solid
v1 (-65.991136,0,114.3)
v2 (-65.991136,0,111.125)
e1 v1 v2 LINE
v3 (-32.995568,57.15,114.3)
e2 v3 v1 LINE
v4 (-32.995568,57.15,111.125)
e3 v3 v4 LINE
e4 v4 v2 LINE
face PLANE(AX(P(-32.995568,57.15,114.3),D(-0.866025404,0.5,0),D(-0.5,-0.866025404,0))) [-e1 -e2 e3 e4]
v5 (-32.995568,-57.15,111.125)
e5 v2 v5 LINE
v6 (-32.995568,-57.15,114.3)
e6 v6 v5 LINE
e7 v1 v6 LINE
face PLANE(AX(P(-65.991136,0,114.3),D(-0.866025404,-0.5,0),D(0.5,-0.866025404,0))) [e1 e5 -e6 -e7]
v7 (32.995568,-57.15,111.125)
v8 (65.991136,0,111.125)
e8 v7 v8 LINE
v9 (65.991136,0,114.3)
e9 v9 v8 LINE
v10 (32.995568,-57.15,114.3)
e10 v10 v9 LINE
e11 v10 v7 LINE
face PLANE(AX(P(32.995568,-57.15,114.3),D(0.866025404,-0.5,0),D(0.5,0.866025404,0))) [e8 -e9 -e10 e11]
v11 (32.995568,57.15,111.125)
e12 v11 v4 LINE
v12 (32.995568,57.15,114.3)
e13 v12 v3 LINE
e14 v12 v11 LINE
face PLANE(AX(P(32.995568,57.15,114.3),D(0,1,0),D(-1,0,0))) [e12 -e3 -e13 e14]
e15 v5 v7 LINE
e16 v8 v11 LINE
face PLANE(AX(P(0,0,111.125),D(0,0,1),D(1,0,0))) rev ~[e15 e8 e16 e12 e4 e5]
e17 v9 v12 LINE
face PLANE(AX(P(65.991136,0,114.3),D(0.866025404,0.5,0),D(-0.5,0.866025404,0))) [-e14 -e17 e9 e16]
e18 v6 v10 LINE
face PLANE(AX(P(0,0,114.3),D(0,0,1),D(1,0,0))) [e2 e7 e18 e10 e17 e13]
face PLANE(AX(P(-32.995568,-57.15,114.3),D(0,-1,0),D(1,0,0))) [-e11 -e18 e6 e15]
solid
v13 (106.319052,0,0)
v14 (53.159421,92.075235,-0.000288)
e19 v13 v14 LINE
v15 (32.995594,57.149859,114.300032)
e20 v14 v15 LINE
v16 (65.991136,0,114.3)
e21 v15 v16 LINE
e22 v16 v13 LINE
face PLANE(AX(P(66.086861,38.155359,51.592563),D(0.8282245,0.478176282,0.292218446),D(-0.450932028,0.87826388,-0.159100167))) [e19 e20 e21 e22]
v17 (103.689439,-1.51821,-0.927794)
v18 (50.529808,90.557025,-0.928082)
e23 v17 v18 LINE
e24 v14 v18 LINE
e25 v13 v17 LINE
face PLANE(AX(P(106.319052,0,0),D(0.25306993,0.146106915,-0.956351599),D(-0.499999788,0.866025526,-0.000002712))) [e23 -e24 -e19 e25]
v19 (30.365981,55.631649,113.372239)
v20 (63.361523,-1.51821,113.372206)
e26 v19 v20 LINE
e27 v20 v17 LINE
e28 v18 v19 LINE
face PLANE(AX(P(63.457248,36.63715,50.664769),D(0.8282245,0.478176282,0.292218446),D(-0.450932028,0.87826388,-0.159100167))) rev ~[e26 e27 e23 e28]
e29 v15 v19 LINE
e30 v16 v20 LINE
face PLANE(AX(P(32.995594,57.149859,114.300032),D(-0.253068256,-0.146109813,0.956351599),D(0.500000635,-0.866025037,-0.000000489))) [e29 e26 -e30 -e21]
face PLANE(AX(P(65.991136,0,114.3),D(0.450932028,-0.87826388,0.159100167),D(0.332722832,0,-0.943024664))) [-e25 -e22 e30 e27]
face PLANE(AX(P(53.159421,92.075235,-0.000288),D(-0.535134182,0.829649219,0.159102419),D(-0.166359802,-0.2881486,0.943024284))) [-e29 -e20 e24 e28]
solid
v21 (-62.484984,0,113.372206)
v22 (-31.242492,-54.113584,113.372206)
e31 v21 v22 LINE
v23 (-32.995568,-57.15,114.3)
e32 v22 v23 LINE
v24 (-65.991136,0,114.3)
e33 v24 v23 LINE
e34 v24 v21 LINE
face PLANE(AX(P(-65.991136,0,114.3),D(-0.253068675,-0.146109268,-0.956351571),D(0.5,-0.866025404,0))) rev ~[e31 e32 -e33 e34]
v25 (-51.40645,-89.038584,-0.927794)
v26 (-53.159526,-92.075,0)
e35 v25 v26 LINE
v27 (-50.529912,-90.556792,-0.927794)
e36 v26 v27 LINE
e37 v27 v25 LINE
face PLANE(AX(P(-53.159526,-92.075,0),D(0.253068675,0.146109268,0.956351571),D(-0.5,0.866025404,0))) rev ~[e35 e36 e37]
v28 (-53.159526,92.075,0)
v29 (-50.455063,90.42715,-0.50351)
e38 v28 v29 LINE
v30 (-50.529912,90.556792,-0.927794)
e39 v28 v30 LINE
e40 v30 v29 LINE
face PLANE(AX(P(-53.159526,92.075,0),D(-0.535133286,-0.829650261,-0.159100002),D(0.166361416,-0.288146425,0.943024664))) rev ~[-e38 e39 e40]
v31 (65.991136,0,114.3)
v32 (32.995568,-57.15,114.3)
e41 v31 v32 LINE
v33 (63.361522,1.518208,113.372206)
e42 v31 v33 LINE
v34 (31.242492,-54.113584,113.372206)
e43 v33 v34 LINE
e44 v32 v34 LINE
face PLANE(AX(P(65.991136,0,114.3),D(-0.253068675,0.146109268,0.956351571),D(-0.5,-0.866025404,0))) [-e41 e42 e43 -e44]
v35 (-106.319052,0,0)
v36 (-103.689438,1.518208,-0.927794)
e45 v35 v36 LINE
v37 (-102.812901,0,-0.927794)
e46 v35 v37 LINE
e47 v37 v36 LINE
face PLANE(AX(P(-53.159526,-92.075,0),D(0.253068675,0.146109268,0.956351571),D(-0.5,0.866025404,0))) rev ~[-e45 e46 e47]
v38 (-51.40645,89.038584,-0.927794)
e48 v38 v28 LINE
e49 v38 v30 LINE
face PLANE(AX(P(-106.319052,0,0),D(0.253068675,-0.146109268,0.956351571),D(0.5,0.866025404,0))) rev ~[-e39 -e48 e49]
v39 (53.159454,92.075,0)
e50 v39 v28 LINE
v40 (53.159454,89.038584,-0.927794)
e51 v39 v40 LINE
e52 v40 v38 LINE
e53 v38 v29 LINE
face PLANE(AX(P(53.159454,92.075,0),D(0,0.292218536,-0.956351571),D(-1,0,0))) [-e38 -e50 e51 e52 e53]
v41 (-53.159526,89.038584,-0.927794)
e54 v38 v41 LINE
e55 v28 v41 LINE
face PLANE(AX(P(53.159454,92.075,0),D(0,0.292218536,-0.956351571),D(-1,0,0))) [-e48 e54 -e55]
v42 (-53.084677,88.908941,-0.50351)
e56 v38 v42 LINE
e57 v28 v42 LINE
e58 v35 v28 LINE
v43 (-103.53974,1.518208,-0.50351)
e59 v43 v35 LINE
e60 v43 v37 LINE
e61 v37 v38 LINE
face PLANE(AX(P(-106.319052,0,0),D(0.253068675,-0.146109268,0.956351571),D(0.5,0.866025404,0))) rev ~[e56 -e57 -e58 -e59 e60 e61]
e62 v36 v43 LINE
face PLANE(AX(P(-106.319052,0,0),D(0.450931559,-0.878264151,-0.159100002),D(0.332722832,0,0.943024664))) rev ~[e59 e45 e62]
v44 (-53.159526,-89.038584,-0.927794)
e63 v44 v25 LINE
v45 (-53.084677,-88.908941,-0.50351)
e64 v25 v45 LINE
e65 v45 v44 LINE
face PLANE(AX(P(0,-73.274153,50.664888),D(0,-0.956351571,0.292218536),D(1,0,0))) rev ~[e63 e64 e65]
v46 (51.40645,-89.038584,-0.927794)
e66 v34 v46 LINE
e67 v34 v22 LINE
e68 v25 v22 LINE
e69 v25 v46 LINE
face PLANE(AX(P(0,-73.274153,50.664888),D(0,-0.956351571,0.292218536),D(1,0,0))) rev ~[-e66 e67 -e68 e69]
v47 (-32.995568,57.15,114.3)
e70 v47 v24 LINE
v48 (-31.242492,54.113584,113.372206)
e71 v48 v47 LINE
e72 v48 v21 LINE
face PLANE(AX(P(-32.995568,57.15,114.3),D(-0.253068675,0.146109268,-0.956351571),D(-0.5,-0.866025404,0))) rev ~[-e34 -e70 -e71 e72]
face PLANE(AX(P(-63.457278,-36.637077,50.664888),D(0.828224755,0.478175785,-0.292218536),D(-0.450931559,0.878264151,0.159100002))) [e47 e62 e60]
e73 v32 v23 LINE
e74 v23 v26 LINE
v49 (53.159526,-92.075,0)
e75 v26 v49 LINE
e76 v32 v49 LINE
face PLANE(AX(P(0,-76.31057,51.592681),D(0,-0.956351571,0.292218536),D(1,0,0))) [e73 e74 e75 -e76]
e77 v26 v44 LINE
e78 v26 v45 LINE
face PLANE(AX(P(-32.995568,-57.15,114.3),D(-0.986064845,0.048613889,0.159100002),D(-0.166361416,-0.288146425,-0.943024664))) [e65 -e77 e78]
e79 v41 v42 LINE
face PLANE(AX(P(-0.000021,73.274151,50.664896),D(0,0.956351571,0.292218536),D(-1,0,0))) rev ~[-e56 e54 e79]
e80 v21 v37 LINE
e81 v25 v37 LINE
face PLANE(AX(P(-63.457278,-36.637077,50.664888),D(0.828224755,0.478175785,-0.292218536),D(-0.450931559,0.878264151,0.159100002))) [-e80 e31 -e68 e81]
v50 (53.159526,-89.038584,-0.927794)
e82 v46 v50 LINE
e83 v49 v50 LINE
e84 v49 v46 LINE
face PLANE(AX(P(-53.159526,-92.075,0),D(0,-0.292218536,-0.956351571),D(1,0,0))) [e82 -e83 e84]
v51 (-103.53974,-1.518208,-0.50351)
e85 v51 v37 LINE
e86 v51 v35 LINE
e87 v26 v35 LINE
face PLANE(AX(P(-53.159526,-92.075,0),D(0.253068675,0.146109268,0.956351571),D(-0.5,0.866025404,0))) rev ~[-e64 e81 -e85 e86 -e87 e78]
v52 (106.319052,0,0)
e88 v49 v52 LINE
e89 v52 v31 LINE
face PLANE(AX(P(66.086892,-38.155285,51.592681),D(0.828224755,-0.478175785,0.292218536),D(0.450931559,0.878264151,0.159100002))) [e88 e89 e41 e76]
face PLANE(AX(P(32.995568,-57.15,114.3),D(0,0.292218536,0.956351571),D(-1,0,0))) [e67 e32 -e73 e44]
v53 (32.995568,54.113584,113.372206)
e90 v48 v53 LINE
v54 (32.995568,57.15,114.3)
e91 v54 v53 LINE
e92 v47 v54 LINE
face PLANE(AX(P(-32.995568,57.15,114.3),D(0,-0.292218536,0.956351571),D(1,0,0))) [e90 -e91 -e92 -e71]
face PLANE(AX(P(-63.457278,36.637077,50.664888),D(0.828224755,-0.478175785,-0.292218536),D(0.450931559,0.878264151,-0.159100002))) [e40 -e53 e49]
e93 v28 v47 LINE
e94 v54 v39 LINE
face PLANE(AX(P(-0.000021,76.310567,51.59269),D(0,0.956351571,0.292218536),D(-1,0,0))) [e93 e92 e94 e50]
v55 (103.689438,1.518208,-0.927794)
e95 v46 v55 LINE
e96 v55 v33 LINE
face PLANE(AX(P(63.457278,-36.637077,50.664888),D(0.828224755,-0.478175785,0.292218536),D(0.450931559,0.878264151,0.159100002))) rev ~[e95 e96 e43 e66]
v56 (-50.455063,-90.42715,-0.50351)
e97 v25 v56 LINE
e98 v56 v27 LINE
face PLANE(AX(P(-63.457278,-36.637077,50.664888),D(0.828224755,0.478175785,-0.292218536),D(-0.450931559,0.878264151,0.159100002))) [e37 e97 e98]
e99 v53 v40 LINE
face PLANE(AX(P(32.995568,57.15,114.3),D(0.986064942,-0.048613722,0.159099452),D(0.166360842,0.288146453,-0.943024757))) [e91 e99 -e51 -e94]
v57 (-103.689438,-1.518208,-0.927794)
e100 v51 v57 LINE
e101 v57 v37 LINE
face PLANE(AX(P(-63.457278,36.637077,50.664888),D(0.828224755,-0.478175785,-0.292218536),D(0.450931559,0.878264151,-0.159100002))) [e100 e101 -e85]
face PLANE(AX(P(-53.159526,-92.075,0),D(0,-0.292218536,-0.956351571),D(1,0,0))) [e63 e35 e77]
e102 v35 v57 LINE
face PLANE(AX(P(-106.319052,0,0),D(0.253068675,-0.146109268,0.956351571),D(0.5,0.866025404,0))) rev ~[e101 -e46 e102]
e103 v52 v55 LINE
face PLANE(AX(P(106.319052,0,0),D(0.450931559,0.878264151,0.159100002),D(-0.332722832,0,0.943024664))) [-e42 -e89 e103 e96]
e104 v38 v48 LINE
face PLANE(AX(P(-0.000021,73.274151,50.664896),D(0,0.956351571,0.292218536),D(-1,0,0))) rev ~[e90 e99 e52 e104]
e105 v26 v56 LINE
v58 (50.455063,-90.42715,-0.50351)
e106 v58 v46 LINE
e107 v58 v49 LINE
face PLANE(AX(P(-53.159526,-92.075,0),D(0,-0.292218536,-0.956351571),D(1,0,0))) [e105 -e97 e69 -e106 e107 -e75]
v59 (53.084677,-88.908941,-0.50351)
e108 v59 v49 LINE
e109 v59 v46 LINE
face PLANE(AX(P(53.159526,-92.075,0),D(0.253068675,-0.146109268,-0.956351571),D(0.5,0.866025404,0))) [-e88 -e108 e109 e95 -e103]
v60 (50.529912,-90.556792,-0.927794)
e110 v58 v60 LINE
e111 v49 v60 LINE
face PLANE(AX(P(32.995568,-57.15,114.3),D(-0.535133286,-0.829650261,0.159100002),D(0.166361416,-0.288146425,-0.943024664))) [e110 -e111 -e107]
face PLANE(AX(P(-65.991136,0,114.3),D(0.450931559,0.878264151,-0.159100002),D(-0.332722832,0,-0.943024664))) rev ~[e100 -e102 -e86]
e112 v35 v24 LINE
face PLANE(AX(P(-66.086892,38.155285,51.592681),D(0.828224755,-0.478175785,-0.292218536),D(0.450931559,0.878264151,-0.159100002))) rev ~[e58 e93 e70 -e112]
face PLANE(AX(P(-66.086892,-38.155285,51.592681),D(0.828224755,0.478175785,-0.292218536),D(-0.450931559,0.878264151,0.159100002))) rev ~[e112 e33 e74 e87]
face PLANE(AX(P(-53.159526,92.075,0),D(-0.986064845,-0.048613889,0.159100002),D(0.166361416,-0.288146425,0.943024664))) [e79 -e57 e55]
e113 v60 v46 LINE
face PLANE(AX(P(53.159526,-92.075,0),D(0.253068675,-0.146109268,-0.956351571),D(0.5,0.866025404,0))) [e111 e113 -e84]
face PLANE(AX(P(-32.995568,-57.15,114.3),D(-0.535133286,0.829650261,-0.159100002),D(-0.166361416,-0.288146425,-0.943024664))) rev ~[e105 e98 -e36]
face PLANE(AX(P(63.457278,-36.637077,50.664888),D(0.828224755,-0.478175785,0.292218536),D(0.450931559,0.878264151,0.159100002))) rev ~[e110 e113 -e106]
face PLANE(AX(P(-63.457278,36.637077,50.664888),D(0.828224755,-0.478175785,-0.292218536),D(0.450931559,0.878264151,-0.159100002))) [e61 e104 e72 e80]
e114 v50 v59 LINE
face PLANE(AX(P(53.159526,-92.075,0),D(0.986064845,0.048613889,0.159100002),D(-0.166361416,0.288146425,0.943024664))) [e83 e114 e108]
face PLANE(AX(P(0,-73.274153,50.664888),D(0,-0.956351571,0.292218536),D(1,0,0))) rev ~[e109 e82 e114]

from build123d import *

# Parameters (mm, degrees)
F15_DEPTH = 3.175
F16_DEPTH = 3.175
F17_DEPTH = 3.175
F18_DEPTH = 3.175
F19_DEPTH = 3.175
F20_DEPTH = 3.175
F21_DEPTH = 3.175
F22_W     = 51
F22_H     = 51
F23_DEPTH = 3


with BuildPart() as f15:
    # F14 (on 3pt) → F15 (new body)
    with BuildSketch(Plane(origin=(72.9302177934, -42.1062808751, 25.7316160903), x_dir=(0.4509315595, 0.8782641505, 0.1591000017), z_dir=(0.8282247555, -0.4781757855, 0.2922185356))):
        Polygon((-17.1289231327, 96.8093402992), (-56.8948636851, -17.6873880615), (47.9426159531, -35.3747761231), (47.9426159531, 85.8309615024), align=None)
    extrude(amount=-F15_DEPTH)

    # F4 (on 3pt) → F16 (join)
    with BuildSketch(Plane(origin=(0, -84.2125617502, 25.7316160903), x_dir=(1, 0, 0), z_dir=(0, -0.9563515711, 0.2922185356))):
        Polygon((-32.9955678842, 92.6106952617), (-53.1595260356, -26.9060216653), (53.1595260356, -26.9060216653), (32.9955678842, 92.6106952617), align=None)
    extrude(amount=-F16_DEPTH)

    # F6 (on 3pt) → F17 (join)
    with BuildSketch(Plane(origin=(-72.9302177934, -42.1062808751, 25.7316160903), x_dir=(-0.4509315595, 0.8782641505, 0.1591000017), z_dir=(0.8282247555, 0.4781757855, -0.2922185356))):
        Polygon((-56.8948636851, -17.6873880615), (47.9426159531, -35.3747761231), (47.9426159531, 85.8309615024), (-17.1289231327, 96.8093402992), align=None)
    extrude(amount=F17_DEPTH)

    # F8 (on 3pt) → F18 (join)
    with BuildSketch(Plane(origin=(-72.9302177934, 42.1062808751, 25.7316160903), x_dir=(0.4509315595, 0.8782641505, -0.1591000017), z_dir=(0.8282247555, -0.4781757855, -0.2922185356))):
        Polygon((-47.9426159531, -35.3747761231), (56.8948636851, -17.6873880615), (17.1289231327, 96.8093402992), (-47.9426159531, 85.8309615024), align=None)
    extrude(amount=F18_DEPTH)

    # F10 (on 3pt) → F19 (join)
    with BuildSketch(Plane(origin=(0, 84.2125617502, 25.7316160903), x_dir=(-1, 0, 0), z_dir=(0, 0.9563515711, 0.2922185356))):
        Polygon((-53.1594544198, -26.9060216653), (53.1595260356, -26.9060216653), (32.9955678842, 92.6106952617), (-32.9955678842, 92.6106952617), align=None)
    extrude(amount=-F19_DEPTH)

    # F22 (on face) → F23 (join)
    with BuildSketch(Plane(origin=(0, 84.2125617502, 25.7316160903), x_dir=(-1, 0, 0), z_dir=(0, 0.9563515711, 0.2922185356))):
        with Locations((0, 37.2206158936)):
            Rectangle(F22_W, F22_H)
    extrude(amount=-F23_DEPTH)


with BuildPart() as f20:
    # F12 (on 3pt) → F20 (new body)
    with BuildSketch(Plane(origin=(72.930172863, 42.1063116595, 25.7316002377), x_dir=(-0.4509320281, 0.87826388, -0.159100167), z_dir=(0.8282245004, 0.4781762824, 0.2922184456))):
        Polygon((-47.9426657727, 85.8309615024), (-47.9426657727, -35.3747761231), (56.895113183, -17.6876249146), (17.1287326196, 96.8093622096), align=None)
    extrude(amount=-F20_DEPTH)


with BuildPart() as f21:
    # F2 (on offset) → F21 (new body)
    with BuildSketch(Plane.XY.offset(114.3)):
        Polygon((32.9955678842, 57.15), (-32.9955678842, 57.15), (-65.9911357684, 0), (-32.9955678842, -57.15), (32.9955678842, -57.15), (65.9911357684, 0), align=None)
    extrude(amount=-F21_DEPTH)


solid = Compound([f15.part, f20.part, f21.part])
